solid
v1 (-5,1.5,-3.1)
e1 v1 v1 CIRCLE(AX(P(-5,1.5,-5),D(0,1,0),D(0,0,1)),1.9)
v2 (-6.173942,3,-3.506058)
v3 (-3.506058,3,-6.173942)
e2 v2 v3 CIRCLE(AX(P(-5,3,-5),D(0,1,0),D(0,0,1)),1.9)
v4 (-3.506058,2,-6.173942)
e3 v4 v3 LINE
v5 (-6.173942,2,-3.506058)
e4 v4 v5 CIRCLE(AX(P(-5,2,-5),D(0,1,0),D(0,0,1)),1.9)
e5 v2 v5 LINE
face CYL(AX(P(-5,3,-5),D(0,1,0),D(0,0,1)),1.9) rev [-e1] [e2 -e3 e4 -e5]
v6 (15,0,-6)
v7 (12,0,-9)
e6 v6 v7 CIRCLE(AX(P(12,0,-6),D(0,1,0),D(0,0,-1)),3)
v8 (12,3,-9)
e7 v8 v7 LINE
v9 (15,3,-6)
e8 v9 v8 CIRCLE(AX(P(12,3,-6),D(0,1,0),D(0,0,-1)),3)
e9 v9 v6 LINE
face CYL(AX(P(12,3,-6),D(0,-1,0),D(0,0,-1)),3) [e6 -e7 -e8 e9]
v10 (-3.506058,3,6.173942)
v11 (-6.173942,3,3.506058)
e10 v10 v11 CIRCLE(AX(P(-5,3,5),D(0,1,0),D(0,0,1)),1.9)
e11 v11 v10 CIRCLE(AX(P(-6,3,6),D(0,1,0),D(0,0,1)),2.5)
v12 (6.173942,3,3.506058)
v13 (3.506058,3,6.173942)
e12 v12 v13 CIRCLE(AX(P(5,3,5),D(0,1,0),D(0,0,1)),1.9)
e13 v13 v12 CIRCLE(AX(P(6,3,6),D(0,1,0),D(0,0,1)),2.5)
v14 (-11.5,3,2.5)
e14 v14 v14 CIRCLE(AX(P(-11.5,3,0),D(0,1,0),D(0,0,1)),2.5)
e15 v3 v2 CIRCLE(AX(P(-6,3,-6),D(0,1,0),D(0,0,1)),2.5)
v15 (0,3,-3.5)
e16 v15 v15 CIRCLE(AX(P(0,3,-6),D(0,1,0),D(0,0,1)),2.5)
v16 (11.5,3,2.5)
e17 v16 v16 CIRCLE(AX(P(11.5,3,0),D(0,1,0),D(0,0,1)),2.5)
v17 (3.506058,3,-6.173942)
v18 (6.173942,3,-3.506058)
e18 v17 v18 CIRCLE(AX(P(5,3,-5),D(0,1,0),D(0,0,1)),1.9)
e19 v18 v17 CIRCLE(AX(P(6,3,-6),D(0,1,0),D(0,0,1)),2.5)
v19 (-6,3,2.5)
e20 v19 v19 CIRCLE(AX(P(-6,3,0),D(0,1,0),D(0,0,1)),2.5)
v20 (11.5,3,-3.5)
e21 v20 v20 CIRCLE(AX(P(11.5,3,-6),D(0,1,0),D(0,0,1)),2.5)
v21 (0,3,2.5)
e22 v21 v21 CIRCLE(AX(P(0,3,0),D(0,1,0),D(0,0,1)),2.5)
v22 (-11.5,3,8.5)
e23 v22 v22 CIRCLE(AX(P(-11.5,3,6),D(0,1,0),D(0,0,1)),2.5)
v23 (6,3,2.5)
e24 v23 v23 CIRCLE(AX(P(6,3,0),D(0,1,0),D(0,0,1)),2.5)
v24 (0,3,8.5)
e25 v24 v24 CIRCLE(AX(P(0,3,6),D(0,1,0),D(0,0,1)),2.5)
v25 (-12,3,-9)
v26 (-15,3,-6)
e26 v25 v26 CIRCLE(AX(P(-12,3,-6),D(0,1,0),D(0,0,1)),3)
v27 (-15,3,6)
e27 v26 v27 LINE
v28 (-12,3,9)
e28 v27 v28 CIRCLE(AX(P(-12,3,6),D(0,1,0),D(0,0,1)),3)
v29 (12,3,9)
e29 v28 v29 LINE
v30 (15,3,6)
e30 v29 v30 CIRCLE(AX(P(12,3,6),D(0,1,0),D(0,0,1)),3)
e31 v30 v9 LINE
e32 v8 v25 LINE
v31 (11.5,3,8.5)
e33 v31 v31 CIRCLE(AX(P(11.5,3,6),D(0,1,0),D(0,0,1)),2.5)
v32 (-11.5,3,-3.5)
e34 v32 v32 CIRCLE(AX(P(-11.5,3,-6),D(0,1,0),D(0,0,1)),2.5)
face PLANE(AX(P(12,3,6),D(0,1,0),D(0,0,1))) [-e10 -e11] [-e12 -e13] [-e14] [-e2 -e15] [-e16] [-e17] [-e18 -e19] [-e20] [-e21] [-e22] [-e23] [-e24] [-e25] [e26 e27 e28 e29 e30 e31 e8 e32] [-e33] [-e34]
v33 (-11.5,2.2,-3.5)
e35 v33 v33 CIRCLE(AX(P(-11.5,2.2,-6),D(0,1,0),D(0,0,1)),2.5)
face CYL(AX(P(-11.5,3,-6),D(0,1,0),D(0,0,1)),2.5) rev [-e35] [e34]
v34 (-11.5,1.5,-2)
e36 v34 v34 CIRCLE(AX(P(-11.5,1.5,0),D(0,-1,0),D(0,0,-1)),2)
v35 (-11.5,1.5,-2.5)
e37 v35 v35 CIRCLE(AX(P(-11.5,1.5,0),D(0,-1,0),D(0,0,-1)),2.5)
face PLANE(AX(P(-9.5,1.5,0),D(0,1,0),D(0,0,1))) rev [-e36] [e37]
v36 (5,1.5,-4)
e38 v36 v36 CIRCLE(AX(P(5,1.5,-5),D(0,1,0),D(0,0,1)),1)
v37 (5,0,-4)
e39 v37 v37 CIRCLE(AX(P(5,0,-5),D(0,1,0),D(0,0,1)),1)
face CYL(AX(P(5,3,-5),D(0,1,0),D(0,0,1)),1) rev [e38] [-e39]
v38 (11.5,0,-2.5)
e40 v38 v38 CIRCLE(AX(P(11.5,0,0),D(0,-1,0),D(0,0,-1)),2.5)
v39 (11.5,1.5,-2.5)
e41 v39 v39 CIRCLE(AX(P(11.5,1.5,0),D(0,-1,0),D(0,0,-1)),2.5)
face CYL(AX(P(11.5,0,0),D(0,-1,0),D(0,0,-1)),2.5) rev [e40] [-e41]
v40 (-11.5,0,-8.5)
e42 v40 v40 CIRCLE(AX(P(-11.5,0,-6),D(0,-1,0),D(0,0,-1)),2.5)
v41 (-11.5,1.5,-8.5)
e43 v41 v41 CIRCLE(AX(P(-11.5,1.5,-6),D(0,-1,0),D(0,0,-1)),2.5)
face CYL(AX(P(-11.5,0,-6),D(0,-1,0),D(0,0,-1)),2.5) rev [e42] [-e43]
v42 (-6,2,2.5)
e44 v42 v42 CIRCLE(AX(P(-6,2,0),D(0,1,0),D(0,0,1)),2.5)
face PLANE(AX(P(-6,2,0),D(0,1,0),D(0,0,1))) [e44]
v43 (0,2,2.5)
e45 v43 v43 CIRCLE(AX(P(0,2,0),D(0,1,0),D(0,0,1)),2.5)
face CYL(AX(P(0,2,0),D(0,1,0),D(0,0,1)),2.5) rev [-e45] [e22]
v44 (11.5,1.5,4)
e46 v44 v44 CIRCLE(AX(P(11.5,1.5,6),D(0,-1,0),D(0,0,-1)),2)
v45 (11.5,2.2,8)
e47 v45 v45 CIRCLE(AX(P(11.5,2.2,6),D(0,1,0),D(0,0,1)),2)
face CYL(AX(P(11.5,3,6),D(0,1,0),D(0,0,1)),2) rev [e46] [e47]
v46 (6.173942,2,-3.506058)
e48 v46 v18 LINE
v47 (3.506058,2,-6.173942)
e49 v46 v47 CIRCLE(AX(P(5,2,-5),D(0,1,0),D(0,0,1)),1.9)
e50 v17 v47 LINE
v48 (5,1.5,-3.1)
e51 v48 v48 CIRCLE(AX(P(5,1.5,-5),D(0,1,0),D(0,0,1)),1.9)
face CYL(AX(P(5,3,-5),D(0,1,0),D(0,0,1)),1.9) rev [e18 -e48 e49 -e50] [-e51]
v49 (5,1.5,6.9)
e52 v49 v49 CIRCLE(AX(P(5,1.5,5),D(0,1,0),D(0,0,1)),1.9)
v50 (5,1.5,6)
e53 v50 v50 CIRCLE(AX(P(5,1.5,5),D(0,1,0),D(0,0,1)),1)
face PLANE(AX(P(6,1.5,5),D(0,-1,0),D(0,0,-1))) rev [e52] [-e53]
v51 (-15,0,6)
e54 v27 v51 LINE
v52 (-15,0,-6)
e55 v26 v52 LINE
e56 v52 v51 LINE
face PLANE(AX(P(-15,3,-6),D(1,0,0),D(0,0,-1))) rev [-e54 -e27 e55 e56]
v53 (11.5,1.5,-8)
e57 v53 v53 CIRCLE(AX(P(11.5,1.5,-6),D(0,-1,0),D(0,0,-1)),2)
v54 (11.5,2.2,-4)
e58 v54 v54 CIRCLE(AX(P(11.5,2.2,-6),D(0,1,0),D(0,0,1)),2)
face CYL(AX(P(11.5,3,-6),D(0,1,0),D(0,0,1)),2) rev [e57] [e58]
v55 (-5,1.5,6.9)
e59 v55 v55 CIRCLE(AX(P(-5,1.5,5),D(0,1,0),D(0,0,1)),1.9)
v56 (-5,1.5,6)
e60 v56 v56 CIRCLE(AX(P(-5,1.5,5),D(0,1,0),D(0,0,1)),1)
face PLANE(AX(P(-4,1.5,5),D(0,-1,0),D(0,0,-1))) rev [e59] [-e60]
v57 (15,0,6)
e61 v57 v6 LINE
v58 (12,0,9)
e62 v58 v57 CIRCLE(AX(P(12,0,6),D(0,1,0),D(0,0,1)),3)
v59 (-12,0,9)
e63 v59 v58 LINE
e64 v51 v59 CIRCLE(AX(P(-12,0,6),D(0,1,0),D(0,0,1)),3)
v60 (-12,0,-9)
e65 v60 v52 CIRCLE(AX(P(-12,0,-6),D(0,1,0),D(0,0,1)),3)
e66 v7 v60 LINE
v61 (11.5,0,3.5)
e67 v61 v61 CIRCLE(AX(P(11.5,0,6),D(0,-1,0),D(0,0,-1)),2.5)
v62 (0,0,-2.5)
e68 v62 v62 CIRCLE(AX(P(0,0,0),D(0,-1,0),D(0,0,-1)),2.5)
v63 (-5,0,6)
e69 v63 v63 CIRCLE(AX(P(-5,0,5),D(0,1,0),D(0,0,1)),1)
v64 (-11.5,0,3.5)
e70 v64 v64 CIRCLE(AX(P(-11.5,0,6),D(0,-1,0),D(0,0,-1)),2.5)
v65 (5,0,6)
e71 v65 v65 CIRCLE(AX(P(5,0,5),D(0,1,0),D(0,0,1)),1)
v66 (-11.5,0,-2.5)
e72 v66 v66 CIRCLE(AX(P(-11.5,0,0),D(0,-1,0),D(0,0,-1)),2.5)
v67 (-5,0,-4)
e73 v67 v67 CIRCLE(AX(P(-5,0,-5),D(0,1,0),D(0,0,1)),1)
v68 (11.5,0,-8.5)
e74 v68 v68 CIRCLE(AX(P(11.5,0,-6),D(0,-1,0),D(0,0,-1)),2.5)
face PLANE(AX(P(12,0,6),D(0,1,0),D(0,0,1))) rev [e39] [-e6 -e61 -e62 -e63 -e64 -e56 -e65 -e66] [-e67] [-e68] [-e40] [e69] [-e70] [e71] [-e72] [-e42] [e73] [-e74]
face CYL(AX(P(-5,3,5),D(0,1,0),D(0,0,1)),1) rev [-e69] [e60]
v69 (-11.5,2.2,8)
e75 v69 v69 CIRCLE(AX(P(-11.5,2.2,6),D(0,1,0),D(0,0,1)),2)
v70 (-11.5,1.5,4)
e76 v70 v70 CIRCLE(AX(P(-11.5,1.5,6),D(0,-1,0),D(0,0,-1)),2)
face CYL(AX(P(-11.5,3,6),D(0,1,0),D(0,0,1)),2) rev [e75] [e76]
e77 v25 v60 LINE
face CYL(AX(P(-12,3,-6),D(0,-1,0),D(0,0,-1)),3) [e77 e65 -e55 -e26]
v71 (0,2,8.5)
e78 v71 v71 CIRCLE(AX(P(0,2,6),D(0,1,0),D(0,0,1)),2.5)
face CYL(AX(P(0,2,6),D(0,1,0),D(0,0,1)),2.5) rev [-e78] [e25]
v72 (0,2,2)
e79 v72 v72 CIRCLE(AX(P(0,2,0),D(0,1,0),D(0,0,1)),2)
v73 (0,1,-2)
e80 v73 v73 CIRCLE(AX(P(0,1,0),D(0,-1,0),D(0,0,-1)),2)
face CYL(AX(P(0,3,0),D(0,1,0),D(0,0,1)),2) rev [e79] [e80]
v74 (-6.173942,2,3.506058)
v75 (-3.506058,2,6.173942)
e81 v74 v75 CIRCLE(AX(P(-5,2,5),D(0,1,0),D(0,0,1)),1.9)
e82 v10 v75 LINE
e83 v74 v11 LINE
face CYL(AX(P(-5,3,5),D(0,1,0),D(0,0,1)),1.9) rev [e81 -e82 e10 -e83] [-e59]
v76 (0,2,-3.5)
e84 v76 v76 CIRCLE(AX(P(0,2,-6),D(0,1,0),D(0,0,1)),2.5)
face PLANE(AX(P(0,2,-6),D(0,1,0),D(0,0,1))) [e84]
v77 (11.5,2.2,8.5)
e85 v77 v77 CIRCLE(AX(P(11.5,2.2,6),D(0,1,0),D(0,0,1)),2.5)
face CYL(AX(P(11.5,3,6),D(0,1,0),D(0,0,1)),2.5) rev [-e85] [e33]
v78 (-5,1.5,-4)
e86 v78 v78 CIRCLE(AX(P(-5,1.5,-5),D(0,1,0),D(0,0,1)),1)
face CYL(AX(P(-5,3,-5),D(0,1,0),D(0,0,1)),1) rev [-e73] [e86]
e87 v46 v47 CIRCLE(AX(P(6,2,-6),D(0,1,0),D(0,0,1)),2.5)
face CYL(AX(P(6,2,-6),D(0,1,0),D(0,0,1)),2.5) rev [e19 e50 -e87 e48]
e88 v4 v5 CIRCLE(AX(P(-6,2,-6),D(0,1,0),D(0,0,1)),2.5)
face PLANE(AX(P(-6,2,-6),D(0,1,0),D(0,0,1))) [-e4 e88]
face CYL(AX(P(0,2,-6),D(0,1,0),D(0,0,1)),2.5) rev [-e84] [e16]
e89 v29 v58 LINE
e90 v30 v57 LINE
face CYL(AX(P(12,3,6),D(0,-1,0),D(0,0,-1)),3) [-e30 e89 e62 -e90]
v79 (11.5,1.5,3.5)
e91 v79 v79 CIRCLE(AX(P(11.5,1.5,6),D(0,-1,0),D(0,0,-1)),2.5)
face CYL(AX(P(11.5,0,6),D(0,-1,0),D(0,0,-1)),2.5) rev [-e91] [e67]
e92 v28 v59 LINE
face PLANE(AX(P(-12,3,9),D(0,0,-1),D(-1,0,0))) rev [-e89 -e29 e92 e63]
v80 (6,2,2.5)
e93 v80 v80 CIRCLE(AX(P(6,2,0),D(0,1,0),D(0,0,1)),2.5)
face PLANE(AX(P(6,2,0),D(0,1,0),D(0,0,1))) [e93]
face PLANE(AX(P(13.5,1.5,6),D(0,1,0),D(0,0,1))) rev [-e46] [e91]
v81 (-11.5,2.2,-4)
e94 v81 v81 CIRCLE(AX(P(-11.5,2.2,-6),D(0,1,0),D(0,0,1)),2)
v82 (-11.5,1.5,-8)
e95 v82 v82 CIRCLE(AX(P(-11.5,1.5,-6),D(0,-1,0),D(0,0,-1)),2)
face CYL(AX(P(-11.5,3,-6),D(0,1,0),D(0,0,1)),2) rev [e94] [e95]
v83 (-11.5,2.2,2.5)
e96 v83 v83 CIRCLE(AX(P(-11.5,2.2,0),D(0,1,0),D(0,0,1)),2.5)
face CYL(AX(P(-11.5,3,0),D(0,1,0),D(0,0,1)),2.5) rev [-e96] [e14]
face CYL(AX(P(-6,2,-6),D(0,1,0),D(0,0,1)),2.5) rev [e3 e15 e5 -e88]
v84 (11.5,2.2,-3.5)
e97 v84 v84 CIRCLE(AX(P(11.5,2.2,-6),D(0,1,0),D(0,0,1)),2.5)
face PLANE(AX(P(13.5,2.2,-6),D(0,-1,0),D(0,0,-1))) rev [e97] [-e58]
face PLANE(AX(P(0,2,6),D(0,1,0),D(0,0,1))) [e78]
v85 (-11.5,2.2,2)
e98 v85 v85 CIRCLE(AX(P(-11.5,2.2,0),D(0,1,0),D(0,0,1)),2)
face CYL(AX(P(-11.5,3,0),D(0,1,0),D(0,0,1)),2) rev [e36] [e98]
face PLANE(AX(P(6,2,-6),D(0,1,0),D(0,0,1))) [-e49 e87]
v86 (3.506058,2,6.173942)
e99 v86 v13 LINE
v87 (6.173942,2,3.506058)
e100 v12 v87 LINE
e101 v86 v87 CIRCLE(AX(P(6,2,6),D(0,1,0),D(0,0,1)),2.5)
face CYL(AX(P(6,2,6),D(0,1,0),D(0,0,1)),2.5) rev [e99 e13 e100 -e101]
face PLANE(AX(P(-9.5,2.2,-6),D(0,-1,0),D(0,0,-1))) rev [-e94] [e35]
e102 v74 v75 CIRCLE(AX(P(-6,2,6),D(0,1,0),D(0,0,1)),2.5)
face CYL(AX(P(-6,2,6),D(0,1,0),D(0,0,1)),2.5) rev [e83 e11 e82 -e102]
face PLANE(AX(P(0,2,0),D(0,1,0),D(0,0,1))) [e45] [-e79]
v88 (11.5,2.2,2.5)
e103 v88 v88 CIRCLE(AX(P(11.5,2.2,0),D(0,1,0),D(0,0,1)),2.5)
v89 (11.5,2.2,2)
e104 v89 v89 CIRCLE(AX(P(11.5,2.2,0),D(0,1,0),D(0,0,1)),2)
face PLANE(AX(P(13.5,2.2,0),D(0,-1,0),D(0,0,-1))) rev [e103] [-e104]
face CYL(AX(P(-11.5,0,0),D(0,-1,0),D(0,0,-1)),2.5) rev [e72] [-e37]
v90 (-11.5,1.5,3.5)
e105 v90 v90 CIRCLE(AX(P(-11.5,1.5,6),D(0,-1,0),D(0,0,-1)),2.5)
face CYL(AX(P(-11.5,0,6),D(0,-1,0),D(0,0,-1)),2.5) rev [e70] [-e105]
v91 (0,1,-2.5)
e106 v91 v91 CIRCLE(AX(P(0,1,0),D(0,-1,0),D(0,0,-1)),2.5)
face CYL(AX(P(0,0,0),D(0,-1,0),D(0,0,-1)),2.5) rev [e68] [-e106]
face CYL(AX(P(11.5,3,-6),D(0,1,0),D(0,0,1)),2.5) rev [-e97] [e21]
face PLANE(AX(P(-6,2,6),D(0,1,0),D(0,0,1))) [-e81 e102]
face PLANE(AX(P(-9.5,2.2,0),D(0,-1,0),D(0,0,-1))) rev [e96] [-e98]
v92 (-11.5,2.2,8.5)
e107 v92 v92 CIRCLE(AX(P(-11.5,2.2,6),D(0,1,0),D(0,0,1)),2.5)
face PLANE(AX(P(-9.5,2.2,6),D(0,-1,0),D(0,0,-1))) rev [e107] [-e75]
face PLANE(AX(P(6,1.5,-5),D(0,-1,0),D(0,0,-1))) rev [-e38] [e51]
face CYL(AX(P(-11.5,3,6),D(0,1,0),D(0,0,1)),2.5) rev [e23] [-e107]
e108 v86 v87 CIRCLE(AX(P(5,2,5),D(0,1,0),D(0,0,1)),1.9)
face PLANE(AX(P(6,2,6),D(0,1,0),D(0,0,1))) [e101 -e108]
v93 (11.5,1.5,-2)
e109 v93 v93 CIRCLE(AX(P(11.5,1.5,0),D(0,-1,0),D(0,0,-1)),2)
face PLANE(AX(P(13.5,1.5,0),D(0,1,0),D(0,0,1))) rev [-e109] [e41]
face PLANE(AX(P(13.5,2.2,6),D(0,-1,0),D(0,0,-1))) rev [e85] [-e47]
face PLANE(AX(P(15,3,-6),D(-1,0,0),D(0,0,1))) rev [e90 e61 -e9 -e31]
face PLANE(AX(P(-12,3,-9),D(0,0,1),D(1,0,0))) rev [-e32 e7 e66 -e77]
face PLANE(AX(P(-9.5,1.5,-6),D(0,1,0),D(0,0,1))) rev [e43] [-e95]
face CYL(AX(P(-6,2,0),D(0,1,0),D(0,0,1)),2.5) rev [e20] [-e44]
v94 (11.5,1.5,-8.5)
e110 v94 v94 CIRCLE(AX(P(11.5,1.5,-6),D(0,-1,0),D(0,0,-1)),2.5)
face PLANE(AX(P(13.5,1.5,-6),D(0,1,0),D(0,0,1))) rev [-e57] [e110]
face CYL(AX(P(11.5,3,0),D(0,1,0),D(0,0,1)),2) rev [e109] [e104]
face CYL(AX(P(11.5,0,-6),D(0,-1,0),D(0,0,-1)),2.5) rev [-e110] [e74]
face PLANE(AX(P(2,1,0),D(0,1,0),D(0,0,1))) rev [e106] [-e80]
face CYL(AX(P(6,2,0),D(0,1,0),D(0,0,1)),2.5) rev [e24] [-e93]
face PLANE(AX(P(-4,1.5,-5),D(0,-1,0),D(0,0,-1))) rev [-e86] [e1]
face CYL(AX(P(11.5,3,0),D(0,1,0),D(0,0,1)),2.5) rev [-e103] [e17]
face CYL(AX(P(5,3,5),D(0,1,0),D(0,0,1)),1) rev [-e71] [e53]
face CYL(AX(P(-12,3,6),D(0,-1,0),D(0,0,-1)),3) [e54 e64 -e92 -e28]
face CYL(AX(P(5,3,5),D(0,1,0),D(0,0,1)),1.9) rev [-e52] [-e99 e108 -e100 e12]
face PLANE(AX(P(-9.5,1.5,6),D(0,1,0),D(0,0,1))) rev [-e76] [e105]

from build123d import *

# Parameters (mm, degrees)
BOSS_EXTRUDE1_DEPTH     = 3
HOLE2_AT_2_COUNT        = 2
HOLE2_AT_2_PITCH        = 6
HOLE2_AT_3_COUNT        = 2
HOLE2_AT_3_PITCH        = 12
HOLE3_OUTLINE_R         = 2.5
HOLE3_DEPTH             = 1.5
SKETCH8_R               = 2.5
CUT_EXTRUDE1_DEPTH      = 1
FILL_START              = 2
FILL_PATTERN2_OUTLINE_R = 2.5
FILL_PATTERN2_DEPTH     = 1
HOLE6_D                 = 4
HOLE6_DEPTH             = 1.5
HOLE6_CBORE_D           = 5
HOLE6_CBORE_DEPTH       = 1
HOLE6_TIP               = 1.201721238
HOLE7_D                 = 4
HOLE7_DEPTH             = 3
HOLE7_CBORE_D           = 5
HOLE7_CBORE_DEPTH       = 1
HOLE7_TIP               = 1.201721238
HOLE8_D                 = 2
HOLE8_DEPTH             = 3
HOLE8_CBORE_D           = 3.8
HOLE8_CBORE_DEPTH       = 1.5
HOLE8_TIP               = 0.600860619


# Read off the part's stored shape, not the designer's step: Hole3, Fill Pattern2
with BuildPart() as part:
    # Sketch1 → Boss-Extrude1 (new body)
    with BuildSketch(Plane(origin=(0, 0, 0), x_dir=(1, 0, 0), z_dir=(0, 1, 0))):
        with BuildLine():
            Line((-12, 9), (12, 9))
            ThreePointArc((12, 9), (14.121320344, 8.121320344), (15, 6))
            Line((15, 6), (15, -6))
            ThreePointArc((15, -6), (14.121320344, -8.121320344), (12, -9))
            Line((12, -9), (-12, -9))
            ThreePointArc((-12, -9), (-14.121320344, -8.121320344), (-15, -6))
            Line((-15, -6), (-15, 6))
            ThreePointArc((-15, 6), (-14.121320344, 8.121320344), (-12, 9))
        make_face()
    extrude(amount=BOSS_EXTRUDE1_DEPTH)

    # Sketch3 → Hole2 (revolve, cut)
    with BuildSketch(Plane(origin=(-11.5, 3, -6), x_dir=(0, 0, 1), z_dir=(1, 0, 0))):
        Polygon((0, 0), (0, 2.701721238), (2, 1.5), (2, 0.8), (2.5, 0.8), (2.5, 0), align=None)
    hole2 = revolve(axis=Axis((-11.5, 14.310875039, -6), (0, -1, 0)), mode=Mode.SUBTRACT)

    # Hole2 at 2: Hole2 ×2
    with Locations(*[(0, 0, i * HOLE2_AT_2_PITCH) for i in range(1, HOLE2_AT_2_COUNT)]):
        add(hole2, mode=Mode.SUBTRACT)

    # Hole2 at 3: Hole2 ×2
    with Locations(*[(0, 0, i * HOLE2_AT_3_PITCH) for i in range(1, HOLE2_AT_3_COUNT)]):
        add(hole2, mode=Mode.SUBTRACT)

    # Hole3 outline → Hole3 (cut)
    with BuildSketch(Plane(origin=(0, 0, 0), x_dir=(1, 0, 0), z_dir=(0, 1, 0))):
        with Locations((-11.5, -6)):
            Circle(HOLE3_OUTLINE_R)
        with Locations((-11.5, 0)):
            Circle(HOLE3_OUTLINE_R)
        with Locations((-11.5, 6)):
            Circle(HOLE3_OUTLINE_R)
    hole3 = extrude(amount=HOLE3_DEPTH, mode=Mode.SUBTRACT)

    # Mirror1: Hole2, Hole3 across plane
    add(hole2.mirror(Plane(origin=(0, 0, 0), x_dir=(0, 0, 1), z_dir=(1, 0, 0))), mode=Mode.SUBTRACT)
    add(hole3.mirror(Plane(origin=(0, 0, 0), x_dir=(0, 0, 1), z_dir=(1, 0, 0))), mode=Mode.SUBTRACT)

    # Mirror1 copy 1 sketch → Mirror1 copy 1 (revolve, cut)
    with BuildSketch(Plane(origin=(11.5, 3, 0), x_dir=(0, 0, 1), z_dir=(-1, 0, 0))):
        Polygon((0, 0), (0, -2.701721238), (2, -1.5), (2, -0.8), (2.5, -0.8), (2.5, 0), align=None)
    revolve(axis=Axis((11.5, 14.310875039, 0), (0, 1, 0)), mode=Mode.SUBTRACT)

    # Mirror1 copy 2 sketch → Mirror1 copy 2 (revolve, cut)
    with BuildSketch(Plane(origin=(11.5, 3, 6), x_dir=(0, 0, 1), z_dir=(-1, 0, 0))):
        Polygon((0, 0), (0, -2.701721238), (2, -1.5), (2, -0.8), (2.5, -0.8), (2.5, 0), align=None)
    revolve(axis=Axis((11.5, 14.310875039, 6), (0, 1, 0)), mode=Mode.SUBTRACT)

    # Sketch8 → Cut-Extrude1 (cut)
    with BuildSketch(Plane(origin=(0, 3, 0), x_dir=(1, 0, 0), z_dir=(0, 1, 0))):
        with Locations(Location((0, 0, 0), (0, 0, 270))):
            Circle(SKETCH8_R)
    extrude(amount=-CUT_EXTRUDE1_DEPTH, mode=Mode.SUBTRACT)

    # Fill Pattern2 outline → Fill Pattern2 (cut)
    with BuildSketch(Plane(origin=(0, 0, 0), x_dir=(1, 0, 0), z_dir=(0, 1, 0)).offset(FILL_START)):
        with Locations((-6, -6)):
            Circle(FILL_PATTERN2_OUTLINE_R)
        with Locations((0, -6)):
            Circle(FILL_PATTERN2_OUTLINE_R)
        with Locations((6, -6)):
            Circle(FILL_PATTERN2_OUTLINE_R)
        with Locations((6, 0)):
            Circle(FILL_PATTERN2_OUTLINE_R)
        with Locations((6, 6)):
            Circle(FILL_PATTERN2_OUTLINE_R)
        with Locations((0, 6)):
            Circle(FILL_PATTERN2_OUTLINE_R)
        with Locations((-6, 6)):
            Circle(FILL_PATTERN2_OUTLINE_R)
        with Locations((-6, 0)):
            Circle(FILL_PATTERN2_OUTLINE_R)
    extrude(amount=FILL_PATTERN2_DEPTH, mode=Mode.SUBTRACT)

    # Hole6
    with Locations(Plane(origin=(0, 3, 0), x_dir=(1, 0, 0), z_dir=(0, 1, 0))):
        with Locations((0, 0)):
            CounterBoreHole(HOLE6_D / 2, HOLE6_CBORE_D / 2, HOLE6_CBORE_DEPTH, depth=HOLE6_DEPTH)
            with Locations((0, 0, -(HOLE6_DEPTH + HOLE6_TIP / 2))):  # 118° drill point
                Cone(0, HOLE6_D / 2, HOLE6_TIP, mode=Mode.SUBTRACT)

    # Hole7
    with Locations(Plane(origin=(0, 0, 0), x_dir=(-1, 0, 0), z_dir=(0, -1, 0))):
        with Locations((0, 0)):
            CounterBoreHole(HOLE7_D / 2, HOLE7_CBORE_D / 2, HOLE7_CBORE_DEPTH, depth=HOLE7_DEPTH)
            with Locations((0, 0, -(HOLE7_DEPTH + HOLE7_TIP / 2))):  # 118° drill point
                Cone(0, HOLE7_D / 2, HOLE7_TIP, mode=Mode.SUBTRACT)

    # Hole8
    with Locations(Plane(origin=(0, 3, 0), x_dir=(1, 0, 0), z_dir=(0, 1, 0))):
        with Locations((-5, -5), (-5, 5), (5, 5), (5, -5)):
            CounterBoreHole(HOLE8_D / 2, HOLE8_CBORE_D / 2, HOLE8_CBORE_DEPTH, depth=HOLE8_DEPTH)
            with Locations((0, 0, -(HOLE8_DEPTH + HOLE8_TIP / 2))):  # 118° drill point
                Cone(0, HOLE8_D / 2, HOLE8_TIP, mode=Mode.SUBTRACT)


solid = part.part
